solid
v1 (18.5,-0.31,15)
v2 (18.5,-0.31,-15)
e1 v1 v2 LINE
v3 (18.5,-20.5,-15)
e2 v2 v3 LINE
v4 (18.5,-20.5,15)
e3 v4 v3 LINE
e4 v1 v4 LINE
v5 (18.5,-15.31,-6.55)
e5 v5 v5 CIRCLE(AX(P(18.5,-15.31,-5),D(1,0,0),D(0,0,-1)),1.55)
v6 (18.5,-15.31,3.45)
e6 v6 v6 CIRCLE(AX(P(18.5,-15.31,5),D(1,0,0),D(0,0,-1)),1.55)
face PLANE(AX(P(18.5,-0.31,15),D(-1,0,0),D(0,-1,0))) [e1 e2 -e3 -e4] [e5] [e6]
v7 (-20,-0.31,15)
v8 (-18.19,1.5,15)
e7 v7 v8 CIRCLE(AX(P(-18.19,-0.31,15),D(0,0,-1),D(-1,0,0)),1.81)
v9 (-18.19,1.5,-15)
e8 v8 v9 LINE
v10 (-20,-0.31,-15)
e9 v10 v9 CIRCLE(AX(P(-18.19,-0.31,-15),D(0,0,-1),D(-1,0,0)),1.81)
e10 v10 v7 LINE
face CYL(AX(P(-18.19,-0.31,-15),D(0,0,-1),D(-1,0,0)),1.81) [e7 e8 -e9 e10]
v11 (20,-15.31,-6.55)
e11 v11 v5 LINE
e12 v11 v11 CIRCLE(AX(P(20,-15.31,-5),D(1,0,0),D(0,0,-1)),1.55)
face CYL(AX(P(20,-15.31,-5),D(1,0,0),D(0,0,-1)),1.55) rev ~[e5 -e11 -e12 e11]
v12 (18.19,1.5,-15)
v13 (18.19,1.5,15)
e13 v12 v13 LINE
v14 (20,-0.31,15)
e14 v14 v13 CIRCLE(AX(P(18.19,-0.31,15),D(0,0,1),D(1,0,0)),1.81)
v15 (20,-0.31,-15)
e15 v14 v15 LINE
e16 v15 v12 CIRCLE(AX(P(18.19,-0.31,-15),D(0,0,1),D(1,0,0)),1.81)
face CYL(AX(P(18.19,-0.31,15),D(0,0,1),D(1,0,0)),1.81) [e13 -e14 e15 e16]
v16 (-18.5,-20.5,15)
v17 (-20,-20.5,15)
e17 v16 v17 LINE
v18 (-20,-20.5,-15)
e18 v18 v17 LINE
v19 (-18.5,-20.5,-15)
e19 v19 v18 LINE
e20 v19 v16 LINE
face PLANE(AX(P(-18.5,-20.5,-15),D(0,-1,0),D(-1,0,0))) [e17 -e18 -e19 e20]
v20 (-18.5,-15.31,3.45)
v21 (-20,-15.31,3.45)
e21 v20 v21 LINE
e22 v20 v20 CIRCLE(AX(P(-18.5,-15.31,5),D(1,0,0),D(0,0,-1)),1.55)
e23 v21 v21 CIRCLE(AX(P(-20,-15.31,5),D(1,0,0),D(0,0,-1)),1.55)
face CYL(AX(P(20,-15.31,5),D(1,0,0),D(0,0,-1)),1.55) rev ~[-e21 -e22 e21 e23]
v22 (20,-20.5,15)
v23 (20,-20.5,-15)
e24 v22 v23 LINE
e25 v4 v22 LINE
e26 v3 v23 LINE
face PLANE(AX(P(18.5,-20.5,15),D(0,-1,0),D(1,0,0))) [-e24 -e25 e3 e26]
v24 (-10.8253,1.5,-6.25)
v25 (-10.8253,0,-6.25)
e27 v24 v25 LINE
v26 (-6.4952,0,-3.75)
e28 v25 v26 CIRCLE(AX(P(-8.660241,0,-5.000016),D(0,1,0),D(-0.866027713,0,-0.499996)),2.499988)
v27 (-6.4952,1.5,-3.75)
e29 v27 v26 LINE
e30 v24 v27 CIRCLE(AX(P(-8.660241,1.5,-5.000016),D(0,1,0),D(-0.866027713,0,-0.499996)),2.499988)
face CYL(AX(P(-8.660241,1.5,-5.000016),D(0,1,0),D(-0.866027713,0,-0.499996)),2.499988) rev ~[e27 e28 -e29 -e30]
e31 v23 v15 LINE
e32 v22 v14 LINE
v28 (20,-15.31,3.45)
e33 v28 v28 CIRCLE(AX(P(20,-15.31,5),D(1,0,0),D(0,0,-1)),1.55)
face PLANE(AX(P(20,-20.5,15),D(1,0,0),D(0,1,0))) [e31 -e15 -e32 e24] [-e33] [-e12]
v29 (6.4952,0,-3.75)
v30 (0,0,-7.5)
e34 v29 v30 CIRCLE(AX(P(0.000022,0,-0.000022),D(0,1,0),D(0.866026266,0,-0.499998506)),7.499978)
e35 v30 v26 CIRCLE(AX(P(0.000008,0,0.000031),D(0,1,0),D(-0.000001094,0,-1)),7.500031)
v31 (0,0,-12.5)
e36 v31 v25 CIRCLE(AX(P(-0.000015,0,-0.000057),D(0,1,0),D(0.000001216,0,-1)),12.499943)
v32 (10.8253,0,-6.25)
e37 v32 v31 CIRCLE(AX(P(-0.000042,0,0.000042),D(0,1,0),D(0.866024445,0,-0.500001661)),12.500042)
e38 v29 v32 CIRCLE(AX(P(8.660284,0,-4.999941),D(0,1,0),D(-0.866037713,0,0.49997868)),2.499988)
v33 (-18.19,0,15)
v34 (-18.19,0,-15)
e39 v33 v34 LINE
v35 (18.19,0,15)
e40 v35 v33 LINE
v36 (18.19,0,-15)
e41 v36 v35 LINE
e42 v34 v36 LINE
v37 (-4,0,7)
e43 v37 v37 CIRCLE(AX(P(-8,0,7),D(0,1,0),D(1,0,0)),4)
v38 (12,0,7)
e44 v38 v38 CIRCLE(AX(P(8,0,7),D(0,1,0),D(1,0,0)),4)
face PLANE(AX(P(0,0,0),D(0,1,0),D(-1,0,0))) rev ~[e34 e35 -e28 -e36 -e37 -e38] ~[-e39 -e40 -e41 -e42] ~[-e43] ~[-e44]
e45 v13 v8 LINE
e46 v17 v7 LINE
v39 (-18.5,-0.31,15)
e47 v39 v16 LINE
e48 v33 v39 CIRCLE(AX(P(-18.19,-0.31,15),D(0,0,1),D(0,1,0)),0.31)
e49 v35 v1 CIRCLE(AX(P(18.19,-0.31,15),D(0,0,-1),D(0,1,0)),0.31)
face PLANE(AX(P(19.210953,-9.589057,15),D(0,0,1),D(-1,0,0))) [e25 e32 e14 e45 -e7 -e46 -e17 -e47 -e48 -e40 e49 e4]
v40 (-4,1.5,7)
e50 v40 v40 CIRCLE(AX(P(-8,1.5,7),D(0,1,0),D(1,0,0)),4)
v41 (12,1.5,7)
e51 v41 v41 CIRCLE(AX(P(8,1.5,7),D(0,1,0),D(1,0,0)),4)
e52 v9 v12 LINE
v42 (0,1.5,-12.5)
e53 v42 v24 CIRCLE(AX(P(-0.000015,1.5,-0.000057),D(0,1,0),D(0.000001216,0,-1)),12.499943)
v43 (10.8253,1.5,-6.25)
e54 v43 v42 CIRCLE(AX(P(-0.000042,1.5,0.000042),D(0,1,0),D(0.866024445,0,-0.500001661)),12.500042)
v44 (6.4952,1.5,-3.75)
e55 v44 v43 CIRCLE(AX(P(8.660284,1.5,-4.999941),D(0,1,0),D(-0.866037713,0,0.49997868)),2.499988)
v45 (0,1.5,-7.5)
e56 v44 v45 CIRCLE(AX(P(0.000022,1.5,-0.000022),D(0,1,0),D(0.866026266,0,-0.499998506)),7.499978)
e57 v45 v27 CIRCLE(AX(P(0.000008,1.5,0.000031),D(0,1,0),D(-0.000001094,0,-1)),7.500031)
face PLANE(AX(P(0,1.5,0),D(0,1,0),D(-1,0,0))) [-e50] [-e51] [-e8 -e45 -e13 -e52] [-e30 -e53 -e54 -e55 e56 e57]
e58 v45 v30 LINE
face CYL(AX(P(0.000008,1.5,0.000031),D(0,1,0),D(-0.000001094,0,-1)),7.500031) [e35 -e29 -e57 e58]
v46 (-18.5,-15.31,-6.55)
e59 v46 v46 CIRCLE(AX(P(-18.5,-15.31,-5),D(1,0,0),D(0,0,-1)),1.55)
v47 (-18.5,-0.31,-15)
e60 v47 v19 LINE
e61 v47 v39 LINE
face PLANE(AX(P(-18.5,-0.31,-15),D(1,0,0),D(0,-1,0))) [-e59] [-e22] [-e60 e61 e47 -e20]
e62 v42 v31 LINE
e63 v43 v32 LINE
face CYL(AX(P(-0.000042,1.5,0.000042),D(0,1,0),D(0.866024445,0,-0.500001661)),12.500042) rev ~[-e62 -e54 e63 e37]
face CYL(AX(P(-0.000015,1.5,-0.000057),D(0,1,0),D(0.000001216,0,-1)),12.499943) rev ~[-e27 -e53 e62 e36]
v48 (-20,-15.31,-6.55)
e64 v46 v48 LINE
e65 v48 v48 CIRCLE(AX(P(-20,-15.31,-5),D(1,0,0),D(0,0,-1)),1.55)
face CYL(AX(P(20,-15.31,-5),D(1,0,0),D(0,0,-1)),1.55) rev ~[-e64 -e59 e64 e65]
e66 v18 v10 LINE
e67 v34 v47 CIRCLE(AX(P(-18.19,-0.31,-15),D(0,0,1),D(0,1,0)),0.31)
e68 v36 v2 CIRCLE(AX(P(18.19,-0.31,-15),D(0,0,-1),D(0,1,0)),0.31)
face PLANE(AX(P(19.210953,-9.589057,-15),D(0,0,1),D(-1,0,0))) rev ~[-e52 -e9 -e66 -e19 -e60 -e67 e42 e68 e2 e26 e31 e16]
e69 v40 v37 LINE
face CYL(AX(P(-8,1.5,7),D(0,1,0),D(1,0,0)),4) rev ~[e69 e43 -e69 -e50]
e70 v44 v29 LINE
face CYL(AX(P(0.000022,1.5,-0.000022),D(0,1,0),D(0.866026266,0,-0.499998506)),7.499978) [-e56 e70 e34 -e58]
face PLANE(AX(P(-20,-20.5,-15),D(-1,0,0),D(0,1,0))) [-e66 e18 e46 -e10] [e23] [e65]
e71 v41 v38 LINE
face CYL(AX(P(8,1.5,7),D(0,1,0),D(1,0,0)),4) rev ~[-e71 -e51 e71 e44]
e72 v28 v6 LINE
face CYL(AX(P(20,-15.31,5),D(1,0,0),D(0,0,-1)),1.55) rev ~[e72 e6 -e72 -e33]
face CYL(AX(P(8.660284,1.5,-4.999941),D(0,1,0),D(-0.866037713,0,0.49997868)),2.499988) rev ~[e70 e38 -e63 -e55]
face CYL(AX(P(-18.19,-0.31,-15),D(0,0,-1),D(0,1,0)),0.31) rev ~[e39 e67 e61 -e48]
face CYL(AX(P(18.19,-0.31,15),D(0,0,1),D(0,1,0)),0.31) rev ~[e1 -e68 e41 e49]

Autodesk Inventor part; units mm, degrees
ref_plane "YZ Plane" through (0, 0, 0) normal (1, 0, 0) x (0, 1, 0)
ref_plane "XZ Plane" through (0, 0, 0) normal (0, 1, 0) x (-1, 0, 0)
ref_plane "XY Plane" through (0, 0, 0) normal (0, 0, 1) x (1, 0, 0)
sketch "Sketch1" plane through (0, 0, 0) normal (0, 1, 0) x (-1, 0, 0)
  line L0 (20, -15) -> (-20, -15)
  line L1 (-20, -15) -> (-20, 15)
  line L2 (-20, 15) -> (20, 15)
  line L3 (20, 15) -> (20, -15)
  line L4 (20, -15) -> (-20, 15) construction
  line L5 (-20, -15) -> (20, 15) construction
  point P0 (0, 0)
  dimension "d0" = 40
  dimension "d1" = 30
extrude "Plate1" add sketch "Sketch1" along normal blind 1.5
sketch "Sketch2" plane through (18.5, 1.5, 15) normal (1, 0, 0) x (0, 1, 0)
  line L0 (0, -30) -> (0, 0)
  line L1 (0, 0) -> (-22, 0)
  line L2 (-22, 0) -> (-22, -30)
  line L3 (-22, -30) -> (0, -30)
edge flange "Flange1" height 22 angle 90 thickness 1.5 bend radius 0.31 thickness toward (1, 0, 0) relief tear relief width 1.5 relief depth 0.75 corner gap 0.31 corner form 0 edges at (20, 0, 0) (-20, 0, 0) wall of the first edge with corners at (18.5, 1.5, -15) (18.5, 1.5, 15) (18.5, -20.5, 15) (18.5, -20.5, -15)
bend "Bend1"
corner "Corner1"
sketch "Sketch3" plane through (20, -20.5, 15) normal (1, 0, 0) x (0, 0, -1)
  circle A0 centre (20, 5.19) radius 1.55
  circle A1 centre (10, 5.19) radius 1.55
  line L0 (30, 20.19) -> (0, 20.19) projected
  line L1 (30, 0) -> (30, 20.19) projected
  point P0 (15, 20.5)
  dimension "d13" = 3.1
  dimension "d14" = 3.1
  dimension "d15" = 15
  dimension "d16" = 15
  dimension "d17" = 10
  dimension "d33" = 10
extrude "Cut1" cut sketch "Sketch3" against normal through all
sketch "Sketch4" plane through (0, 1.5, 0) normal (0, 1, 0) x (1, 0, 0)
  circle A0 centre (8, -7) radius 4
  circle A1 centre (-8, -7) radius 4
  arc A2 (0, 10) -> (-8.6603, 5) centre (0, 0) ccw construction
  arc A3 (0, 12.5) -> (-10.8253, 6.25) centre (0, 0) ccw
  arc A4 (0, 7.5) -> (-6.4952, 3.75) centre (0, 0) ccw
  arc A5 (0, 7.5) -> (0, 12.5) centre (0, 10) ccw
  arc A6 (-10.8253, 6.25) -> (-6.4952, 3.75) centre (-8.6603, 5) ccw
  line L0 (0, 0) -> (-8.6603, 5) construction
  line L1 (0, 0) -> (0, 10) construction
  arc A7 (8.6603, 5) -> (0, 10) centre (0, 0) ccw construction
  arc A8 (10.8253, 6.25) -> (0, 12.5) centre (0, 0) ccw
  arc A9 (6.4952, 3.75) -> (0, 7.5) centre (0, 0) ccw
  arc A10 (6.4952, 3.75) -> (10.8253, 6.25) centre (8.6603, 5) ccw
  arc A11 (0, 12.5) -> (0, 7.5) centre (0, 10) ccw
  line L2 (0, 0) -> (8.6603, 5) construction
  line L3 (0, 0) -> (0, 10) construction
  dimension "d20" = 8
  dimension "d21" = 8
  dimension "d22" = 10
  dimension "d23" = 60
  dimension "d24" = 5
  dimension "d25" = 60
  dimension "d26" = 5
  dimension "d27" = 7
  dimension "d28" = 7
  dimension "d29" = 8
  dimension "d30" = 8
extrude "Cut2" cut sketch "Sketch4" against normal through all
equation "\"d16\" = d15"
equation "\"d18\" = Thickness"
equation "\"d28\" = d27"
equation "\"d30\" = d29"
equation "\"d31\" = Thickness"
equation "\"d2\" = Thickness"
equation "\"d3\" = BendReliefWidth"
equation "\"d4\" = BendReliefDepth"
equation "\"d5\" = MinimumRemnant"
equation "\"d6\" = TransitionRadius"
equation "\"d9\" = BendRadius"
equation "\"d10\" = CornerReliefSize"
equation "\"d11\" = GapSize"
equation "\"d12\" = JacobiRadiusSize"
equation "\"BendReliefWidth\" = Thickness"
equation "\"BendReliefDepth\" = 0.5 * Thickness"
equation "\"CornerReliefSize\" = 4 * Thickness"
equation "\"MinimumRemnant\" = 2 * Thickness"
equation "\"TransitionRadius\" = BendRadius"
equation "\"JacobiRadiusSize\" = BendRadius"
equation "\"GapSize\" = Thickness"
equation "\"Thickness\" = 1.5"
equation "\"BendRadius\" = 0.31"
properties part number "Head2" material "Aluminum 6061-AHC"
